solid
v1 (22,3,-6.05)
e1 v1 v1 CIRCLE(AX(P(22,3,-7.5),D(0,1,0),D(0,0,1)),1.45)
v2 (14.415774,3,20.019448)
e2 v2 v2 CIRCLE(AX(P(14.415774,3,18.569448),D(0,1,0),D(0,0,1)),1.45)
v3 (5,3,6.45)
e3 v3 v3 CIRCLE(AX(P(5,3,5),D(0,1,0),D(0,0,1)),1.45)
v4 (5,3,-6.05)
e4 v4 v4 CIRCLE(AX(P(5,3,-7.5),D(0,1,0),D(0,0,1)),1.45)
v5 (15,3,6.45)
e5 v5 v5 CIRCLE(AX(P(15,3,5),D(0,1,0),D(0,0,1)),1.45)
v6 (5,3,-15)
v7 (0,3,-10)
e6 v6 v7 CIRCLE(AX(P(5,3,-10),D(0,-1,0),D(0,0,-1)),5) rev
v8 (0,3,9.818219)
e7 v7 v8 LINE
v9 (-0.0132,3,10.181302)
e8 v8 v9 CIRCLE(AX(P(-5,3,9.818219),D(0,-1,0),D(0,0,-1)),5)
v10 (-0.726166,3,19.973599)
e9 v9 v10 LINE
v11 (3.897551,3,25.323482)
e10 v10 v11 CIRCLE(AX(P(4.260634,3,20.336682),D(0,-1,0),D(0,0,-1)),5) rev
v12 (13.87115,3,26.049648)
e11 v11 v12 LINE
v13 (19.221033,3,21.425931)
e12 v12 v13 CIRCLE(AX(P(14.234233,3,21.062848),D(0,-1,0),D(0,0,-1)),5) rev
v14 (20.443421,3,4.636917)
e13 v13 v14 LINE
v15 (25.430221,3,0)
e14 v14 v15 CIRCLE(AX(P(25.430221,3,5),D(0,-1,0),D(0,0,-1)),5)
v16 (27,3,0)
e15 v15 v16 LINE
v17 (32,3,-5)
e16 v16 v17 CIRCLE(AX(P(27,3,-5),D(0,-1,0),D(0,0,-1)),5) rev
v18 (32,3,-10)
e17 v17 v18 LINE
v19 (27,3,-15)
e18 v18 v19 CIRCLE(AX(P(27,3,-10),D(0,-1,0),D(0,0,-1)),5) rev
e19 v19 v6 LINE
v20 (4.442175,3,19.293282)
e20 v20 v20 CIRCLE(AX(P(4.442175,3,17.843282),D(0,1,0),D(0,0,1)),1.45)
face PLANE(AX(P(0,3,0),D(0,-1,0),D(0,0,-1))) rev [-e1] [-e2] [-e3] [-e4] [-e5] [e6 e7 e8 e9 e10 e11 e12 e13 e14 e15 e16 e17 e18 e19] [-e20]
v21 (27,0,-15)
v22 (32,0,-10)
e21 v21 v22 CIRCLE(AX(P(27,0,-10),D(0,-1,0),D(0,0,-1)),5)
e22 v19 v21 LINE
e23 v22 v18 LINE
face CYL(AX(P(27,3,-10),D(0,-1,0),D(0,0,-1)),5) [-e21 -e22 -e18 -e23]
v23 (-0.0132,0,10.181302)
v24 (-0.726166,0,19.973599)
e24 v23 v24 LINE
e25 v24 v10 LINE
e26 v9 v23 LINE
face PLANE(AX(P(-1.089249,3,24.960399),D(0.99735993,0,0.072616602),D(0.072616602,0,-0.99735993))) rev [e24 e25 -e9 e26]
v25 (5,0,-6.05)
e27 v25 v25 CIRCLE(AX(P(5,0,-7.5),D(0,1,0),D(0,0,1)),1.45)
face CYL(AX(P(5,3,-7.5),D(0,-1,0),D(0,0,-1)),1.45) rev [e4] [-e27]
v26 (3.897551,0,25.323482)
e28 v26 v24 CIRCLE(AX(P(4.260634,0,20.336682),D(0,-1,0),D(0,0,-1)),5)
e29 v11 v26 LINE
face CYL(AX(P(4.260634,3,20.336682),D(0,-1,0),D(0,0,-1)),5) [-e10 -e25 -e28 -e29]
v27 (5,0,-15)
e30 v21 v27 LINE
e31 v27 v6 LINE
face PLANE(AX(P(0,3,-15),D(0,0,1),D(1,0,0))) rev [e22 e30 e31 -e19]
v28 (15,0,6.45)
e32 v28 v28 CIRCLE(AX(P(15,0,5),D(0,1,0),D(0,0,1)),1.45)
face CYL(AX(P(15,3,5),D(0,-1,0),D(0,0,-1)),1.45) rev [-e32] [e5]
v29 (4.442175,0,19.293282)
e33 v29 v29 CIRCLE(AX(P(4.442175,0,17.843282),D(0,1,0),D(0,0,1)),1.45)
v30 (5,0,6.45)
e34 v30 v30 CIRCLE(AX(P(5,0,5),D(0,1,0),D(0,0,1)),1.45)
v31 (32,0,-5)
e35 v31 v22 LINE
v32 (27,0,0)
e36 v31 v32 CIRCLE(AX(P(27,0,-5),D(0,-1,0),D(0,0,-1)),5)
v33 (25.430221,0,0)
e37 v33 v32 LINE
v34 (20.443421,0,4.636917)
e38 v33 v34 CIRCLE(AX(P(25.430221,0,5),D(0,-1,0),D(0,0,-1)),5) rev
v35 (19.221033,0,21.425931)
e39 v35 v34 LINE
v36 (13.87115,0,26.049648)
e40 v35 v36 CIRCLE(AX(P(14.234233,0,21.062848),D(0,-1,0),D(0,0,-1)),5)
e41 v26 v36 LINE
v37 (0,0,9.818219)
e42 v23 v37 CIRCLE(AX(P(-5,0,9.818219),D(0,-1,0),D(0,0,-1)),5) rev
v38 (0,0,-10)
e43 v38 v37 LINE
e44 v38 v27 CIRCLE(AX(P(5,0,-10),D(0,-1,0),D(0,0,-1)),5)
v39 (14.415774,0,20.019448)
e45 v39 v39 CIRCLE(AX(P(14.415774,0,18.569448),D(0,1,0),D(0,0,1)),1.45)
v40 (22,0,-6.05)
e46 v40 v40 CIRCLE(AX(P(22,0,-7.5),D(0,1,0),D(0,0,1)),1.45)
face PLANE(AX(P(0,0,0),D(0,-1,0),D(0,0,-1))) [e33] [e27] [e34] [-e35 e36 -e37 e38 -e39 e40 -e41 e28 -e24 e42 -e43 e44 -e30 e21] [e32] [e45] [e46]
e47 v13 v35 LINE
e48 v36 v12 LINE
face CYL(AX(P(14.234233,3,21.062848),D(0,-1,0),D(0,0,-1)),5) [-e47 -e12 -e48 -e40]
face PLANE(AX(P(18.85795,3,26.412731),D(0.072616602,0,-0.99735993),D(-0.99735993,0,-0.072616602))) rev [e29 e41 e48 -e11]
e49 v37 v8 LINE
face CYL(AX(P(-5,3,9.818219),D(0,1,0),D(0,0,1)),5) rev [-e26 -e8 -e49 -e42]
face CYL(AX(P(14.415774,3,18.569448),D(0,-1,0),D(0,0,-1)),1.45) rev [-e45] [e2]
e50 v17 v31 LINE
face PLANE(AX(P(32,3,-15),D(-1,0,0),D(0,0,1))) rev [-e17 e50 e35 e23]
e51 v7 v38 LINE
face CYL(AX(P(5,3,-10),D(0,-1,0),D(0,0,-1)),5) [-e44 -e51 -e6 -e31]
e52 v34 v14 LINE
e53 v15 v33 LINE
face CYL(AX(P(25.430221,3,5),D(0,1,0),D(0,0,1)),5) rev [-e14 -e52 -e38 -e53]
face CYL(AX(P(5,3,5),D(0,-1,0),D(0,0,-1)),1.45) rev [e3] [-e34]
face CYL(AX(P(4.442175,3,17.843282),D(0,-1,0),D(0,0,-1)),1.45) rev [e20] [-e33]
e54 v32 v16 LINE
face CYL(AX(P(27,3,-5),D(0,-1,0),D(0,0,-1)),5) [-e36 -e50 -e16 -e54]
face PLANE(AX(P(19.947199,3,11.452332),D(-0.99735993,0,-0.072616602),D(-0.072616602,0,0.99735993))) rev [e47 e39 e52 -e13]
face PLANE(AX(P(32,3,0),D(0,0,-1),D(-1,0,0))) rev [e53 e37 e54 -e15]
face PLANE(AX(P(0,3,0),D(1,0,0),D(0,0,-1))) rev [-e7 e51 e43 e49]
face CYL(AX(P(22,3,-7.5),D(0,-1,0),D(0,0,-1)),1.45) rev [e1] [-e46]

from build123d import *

# Parameters (mm, degrees)
SKETCH_1_R      = 1.45
EXTRUDE_1_DEPTH = 3
FILLET_1_R      = 5


with BuildPart() as part:
    # 草图1 → 凸台-拉伸1 (new body)
    with BuildSketch(Plane(origin=(0, 0, 0), x_dir=(1, 0, 0), z_dir=(0, 1, 0))):
        Polygon((0, 0), (0, -10), (-1.089249024, -24.960398944), (18.857949568, -26.412730977), (19.947198592, -11.452332033), (20.781029397, 0), (32, 0), (32, 15), (20.781029397, 15), (0, 15), align=None)
        with Locations(Location((5, 7.5, 0), (0, 0, 270))):
            Circle(SKETCH_1_R, mode=Mode.SUBTRACT)
        with Locations(Location((22, 7.5, 0), (0, 0, 270))):
            Circle(SKETCH_1_R, mode=Mode.SUBTRACT)
        with Locations(Location((4.442175136, -17.84328248, 0), (0, 0, 270))):
            Circle(SKETCH_1_R, mode=Mode.SUBTRACT)
        with Locations(Location((14.415774432, -18.569448496, 0), (0, 0, 270))):
            Circle(SKETCH_1_R, mode=Mode.SUBTRACT)
        with Locations(Location((5, -5, 0), (0, 0, 270))):
            Circle(SKETCH_1_R, mode=Mode.SUBTRACT)
        with Locations(Location((15, -5, 0), (0, 0, 270))):
            Circle(SKETCH_1_R, mode=Mode.SUBTRACT)
    extrude(amount=EXTRUDE_1_DEPTH)

    # 圆角1
    # the kernel refuses this fillet: 5 mm, written as the material it adds along each edge
    with BuildSketch(Plane(origin=(20.781029397, 0, 0), x_dir=(1, 0, 0), z_dir=(0, 1, 0))) as fillet_1_piece_1:
        with BuildLine():
            CenterArc((FILLET_1_R * 0.929838236779, -FILLET_1_R), FILLET_1_R, 90, 85.835709886)
            Line((-FILLET_1_R * 0.0675216928189, -FILLET_1_R * 0.927383398372), (0, 0))
            Line((0, 0), (FILLET_1_R * 0.929838236779, 0))
        make_face()
    extrude(amount=3)
    with BuildSketch(Plane(origin=(0, 0, 10), x_dir=(0, 0, -1), z_dir=(0, 1, 0))) as fillet_1_piece_2:
        with BuildLine():
            CenterArc((FILLET_1_R * 0.0363562923998, FILLET_1_R), FILLET_1_R, 265.835709886, 4.164290114)
            Line((-FILLET_1_R * 0.0362603092284, FILLET_1_R * 0.00264007040188), (0, 0))
            Line((0, 0), (FILLET_1_R * 0.0363562923998, 0))
        make_face()
    extrude(amount=3)
    # the kernel refuses this fillet: 5 mm, written as the material it takes off along each edge
    with BuildSketch(Plane(origin=(0, -12.5, -15), x_dir=(0, 0, 1), z_dir=(0, 1, 0)), Plane(origin=(32, -12.5, -15), x_dir=(-1, 0, 0), z_dir=(0, 1, 0))) as fillet_1_2_piece_1:
        with BuildLine():
            CenterArc((FILLET_1_R, FILLET_1_R), FILLET_1_R, 180, 90)
            Line((0, FILLET_1_R), (0, 0))
            Line((0, 0), (FILLET_1_R, 0))
        make_face()
    extrude(amount=28, mode=Mode.SUBTRACT)
    with BuildSketch(Plane(origin=(32, -12.5, 0), x_dir=(-1, 0, 0), z_dir=(0, 1, 0)), Plane(origin=(18.857949568, -12.5, 26.412730977), x_dir=(-0.9973599295981169, 0, -0.0726166016282719), z_dir=(0, 1, 0)), Plane(origin=(-1.089249024, -12.5, 24.960398944), x_dir=(0.07261660162819664, 0, -0.9973599295981225), z_dir=(0, 1, 0))) as fillet_1_2_piece_2:
        with BuildLine():
            CenterArc((FILLET_1_R, -FILLET_1_R), FILLET_1_R, 90, 90)
            Line((0, -FILLET_1_R), (0, 0))
            Line((0, 0), (FILLET_1_R, 0))
        make_face()
    extrude(amount=28, mode=Mode.SUBTRACT)


solid = part.part
